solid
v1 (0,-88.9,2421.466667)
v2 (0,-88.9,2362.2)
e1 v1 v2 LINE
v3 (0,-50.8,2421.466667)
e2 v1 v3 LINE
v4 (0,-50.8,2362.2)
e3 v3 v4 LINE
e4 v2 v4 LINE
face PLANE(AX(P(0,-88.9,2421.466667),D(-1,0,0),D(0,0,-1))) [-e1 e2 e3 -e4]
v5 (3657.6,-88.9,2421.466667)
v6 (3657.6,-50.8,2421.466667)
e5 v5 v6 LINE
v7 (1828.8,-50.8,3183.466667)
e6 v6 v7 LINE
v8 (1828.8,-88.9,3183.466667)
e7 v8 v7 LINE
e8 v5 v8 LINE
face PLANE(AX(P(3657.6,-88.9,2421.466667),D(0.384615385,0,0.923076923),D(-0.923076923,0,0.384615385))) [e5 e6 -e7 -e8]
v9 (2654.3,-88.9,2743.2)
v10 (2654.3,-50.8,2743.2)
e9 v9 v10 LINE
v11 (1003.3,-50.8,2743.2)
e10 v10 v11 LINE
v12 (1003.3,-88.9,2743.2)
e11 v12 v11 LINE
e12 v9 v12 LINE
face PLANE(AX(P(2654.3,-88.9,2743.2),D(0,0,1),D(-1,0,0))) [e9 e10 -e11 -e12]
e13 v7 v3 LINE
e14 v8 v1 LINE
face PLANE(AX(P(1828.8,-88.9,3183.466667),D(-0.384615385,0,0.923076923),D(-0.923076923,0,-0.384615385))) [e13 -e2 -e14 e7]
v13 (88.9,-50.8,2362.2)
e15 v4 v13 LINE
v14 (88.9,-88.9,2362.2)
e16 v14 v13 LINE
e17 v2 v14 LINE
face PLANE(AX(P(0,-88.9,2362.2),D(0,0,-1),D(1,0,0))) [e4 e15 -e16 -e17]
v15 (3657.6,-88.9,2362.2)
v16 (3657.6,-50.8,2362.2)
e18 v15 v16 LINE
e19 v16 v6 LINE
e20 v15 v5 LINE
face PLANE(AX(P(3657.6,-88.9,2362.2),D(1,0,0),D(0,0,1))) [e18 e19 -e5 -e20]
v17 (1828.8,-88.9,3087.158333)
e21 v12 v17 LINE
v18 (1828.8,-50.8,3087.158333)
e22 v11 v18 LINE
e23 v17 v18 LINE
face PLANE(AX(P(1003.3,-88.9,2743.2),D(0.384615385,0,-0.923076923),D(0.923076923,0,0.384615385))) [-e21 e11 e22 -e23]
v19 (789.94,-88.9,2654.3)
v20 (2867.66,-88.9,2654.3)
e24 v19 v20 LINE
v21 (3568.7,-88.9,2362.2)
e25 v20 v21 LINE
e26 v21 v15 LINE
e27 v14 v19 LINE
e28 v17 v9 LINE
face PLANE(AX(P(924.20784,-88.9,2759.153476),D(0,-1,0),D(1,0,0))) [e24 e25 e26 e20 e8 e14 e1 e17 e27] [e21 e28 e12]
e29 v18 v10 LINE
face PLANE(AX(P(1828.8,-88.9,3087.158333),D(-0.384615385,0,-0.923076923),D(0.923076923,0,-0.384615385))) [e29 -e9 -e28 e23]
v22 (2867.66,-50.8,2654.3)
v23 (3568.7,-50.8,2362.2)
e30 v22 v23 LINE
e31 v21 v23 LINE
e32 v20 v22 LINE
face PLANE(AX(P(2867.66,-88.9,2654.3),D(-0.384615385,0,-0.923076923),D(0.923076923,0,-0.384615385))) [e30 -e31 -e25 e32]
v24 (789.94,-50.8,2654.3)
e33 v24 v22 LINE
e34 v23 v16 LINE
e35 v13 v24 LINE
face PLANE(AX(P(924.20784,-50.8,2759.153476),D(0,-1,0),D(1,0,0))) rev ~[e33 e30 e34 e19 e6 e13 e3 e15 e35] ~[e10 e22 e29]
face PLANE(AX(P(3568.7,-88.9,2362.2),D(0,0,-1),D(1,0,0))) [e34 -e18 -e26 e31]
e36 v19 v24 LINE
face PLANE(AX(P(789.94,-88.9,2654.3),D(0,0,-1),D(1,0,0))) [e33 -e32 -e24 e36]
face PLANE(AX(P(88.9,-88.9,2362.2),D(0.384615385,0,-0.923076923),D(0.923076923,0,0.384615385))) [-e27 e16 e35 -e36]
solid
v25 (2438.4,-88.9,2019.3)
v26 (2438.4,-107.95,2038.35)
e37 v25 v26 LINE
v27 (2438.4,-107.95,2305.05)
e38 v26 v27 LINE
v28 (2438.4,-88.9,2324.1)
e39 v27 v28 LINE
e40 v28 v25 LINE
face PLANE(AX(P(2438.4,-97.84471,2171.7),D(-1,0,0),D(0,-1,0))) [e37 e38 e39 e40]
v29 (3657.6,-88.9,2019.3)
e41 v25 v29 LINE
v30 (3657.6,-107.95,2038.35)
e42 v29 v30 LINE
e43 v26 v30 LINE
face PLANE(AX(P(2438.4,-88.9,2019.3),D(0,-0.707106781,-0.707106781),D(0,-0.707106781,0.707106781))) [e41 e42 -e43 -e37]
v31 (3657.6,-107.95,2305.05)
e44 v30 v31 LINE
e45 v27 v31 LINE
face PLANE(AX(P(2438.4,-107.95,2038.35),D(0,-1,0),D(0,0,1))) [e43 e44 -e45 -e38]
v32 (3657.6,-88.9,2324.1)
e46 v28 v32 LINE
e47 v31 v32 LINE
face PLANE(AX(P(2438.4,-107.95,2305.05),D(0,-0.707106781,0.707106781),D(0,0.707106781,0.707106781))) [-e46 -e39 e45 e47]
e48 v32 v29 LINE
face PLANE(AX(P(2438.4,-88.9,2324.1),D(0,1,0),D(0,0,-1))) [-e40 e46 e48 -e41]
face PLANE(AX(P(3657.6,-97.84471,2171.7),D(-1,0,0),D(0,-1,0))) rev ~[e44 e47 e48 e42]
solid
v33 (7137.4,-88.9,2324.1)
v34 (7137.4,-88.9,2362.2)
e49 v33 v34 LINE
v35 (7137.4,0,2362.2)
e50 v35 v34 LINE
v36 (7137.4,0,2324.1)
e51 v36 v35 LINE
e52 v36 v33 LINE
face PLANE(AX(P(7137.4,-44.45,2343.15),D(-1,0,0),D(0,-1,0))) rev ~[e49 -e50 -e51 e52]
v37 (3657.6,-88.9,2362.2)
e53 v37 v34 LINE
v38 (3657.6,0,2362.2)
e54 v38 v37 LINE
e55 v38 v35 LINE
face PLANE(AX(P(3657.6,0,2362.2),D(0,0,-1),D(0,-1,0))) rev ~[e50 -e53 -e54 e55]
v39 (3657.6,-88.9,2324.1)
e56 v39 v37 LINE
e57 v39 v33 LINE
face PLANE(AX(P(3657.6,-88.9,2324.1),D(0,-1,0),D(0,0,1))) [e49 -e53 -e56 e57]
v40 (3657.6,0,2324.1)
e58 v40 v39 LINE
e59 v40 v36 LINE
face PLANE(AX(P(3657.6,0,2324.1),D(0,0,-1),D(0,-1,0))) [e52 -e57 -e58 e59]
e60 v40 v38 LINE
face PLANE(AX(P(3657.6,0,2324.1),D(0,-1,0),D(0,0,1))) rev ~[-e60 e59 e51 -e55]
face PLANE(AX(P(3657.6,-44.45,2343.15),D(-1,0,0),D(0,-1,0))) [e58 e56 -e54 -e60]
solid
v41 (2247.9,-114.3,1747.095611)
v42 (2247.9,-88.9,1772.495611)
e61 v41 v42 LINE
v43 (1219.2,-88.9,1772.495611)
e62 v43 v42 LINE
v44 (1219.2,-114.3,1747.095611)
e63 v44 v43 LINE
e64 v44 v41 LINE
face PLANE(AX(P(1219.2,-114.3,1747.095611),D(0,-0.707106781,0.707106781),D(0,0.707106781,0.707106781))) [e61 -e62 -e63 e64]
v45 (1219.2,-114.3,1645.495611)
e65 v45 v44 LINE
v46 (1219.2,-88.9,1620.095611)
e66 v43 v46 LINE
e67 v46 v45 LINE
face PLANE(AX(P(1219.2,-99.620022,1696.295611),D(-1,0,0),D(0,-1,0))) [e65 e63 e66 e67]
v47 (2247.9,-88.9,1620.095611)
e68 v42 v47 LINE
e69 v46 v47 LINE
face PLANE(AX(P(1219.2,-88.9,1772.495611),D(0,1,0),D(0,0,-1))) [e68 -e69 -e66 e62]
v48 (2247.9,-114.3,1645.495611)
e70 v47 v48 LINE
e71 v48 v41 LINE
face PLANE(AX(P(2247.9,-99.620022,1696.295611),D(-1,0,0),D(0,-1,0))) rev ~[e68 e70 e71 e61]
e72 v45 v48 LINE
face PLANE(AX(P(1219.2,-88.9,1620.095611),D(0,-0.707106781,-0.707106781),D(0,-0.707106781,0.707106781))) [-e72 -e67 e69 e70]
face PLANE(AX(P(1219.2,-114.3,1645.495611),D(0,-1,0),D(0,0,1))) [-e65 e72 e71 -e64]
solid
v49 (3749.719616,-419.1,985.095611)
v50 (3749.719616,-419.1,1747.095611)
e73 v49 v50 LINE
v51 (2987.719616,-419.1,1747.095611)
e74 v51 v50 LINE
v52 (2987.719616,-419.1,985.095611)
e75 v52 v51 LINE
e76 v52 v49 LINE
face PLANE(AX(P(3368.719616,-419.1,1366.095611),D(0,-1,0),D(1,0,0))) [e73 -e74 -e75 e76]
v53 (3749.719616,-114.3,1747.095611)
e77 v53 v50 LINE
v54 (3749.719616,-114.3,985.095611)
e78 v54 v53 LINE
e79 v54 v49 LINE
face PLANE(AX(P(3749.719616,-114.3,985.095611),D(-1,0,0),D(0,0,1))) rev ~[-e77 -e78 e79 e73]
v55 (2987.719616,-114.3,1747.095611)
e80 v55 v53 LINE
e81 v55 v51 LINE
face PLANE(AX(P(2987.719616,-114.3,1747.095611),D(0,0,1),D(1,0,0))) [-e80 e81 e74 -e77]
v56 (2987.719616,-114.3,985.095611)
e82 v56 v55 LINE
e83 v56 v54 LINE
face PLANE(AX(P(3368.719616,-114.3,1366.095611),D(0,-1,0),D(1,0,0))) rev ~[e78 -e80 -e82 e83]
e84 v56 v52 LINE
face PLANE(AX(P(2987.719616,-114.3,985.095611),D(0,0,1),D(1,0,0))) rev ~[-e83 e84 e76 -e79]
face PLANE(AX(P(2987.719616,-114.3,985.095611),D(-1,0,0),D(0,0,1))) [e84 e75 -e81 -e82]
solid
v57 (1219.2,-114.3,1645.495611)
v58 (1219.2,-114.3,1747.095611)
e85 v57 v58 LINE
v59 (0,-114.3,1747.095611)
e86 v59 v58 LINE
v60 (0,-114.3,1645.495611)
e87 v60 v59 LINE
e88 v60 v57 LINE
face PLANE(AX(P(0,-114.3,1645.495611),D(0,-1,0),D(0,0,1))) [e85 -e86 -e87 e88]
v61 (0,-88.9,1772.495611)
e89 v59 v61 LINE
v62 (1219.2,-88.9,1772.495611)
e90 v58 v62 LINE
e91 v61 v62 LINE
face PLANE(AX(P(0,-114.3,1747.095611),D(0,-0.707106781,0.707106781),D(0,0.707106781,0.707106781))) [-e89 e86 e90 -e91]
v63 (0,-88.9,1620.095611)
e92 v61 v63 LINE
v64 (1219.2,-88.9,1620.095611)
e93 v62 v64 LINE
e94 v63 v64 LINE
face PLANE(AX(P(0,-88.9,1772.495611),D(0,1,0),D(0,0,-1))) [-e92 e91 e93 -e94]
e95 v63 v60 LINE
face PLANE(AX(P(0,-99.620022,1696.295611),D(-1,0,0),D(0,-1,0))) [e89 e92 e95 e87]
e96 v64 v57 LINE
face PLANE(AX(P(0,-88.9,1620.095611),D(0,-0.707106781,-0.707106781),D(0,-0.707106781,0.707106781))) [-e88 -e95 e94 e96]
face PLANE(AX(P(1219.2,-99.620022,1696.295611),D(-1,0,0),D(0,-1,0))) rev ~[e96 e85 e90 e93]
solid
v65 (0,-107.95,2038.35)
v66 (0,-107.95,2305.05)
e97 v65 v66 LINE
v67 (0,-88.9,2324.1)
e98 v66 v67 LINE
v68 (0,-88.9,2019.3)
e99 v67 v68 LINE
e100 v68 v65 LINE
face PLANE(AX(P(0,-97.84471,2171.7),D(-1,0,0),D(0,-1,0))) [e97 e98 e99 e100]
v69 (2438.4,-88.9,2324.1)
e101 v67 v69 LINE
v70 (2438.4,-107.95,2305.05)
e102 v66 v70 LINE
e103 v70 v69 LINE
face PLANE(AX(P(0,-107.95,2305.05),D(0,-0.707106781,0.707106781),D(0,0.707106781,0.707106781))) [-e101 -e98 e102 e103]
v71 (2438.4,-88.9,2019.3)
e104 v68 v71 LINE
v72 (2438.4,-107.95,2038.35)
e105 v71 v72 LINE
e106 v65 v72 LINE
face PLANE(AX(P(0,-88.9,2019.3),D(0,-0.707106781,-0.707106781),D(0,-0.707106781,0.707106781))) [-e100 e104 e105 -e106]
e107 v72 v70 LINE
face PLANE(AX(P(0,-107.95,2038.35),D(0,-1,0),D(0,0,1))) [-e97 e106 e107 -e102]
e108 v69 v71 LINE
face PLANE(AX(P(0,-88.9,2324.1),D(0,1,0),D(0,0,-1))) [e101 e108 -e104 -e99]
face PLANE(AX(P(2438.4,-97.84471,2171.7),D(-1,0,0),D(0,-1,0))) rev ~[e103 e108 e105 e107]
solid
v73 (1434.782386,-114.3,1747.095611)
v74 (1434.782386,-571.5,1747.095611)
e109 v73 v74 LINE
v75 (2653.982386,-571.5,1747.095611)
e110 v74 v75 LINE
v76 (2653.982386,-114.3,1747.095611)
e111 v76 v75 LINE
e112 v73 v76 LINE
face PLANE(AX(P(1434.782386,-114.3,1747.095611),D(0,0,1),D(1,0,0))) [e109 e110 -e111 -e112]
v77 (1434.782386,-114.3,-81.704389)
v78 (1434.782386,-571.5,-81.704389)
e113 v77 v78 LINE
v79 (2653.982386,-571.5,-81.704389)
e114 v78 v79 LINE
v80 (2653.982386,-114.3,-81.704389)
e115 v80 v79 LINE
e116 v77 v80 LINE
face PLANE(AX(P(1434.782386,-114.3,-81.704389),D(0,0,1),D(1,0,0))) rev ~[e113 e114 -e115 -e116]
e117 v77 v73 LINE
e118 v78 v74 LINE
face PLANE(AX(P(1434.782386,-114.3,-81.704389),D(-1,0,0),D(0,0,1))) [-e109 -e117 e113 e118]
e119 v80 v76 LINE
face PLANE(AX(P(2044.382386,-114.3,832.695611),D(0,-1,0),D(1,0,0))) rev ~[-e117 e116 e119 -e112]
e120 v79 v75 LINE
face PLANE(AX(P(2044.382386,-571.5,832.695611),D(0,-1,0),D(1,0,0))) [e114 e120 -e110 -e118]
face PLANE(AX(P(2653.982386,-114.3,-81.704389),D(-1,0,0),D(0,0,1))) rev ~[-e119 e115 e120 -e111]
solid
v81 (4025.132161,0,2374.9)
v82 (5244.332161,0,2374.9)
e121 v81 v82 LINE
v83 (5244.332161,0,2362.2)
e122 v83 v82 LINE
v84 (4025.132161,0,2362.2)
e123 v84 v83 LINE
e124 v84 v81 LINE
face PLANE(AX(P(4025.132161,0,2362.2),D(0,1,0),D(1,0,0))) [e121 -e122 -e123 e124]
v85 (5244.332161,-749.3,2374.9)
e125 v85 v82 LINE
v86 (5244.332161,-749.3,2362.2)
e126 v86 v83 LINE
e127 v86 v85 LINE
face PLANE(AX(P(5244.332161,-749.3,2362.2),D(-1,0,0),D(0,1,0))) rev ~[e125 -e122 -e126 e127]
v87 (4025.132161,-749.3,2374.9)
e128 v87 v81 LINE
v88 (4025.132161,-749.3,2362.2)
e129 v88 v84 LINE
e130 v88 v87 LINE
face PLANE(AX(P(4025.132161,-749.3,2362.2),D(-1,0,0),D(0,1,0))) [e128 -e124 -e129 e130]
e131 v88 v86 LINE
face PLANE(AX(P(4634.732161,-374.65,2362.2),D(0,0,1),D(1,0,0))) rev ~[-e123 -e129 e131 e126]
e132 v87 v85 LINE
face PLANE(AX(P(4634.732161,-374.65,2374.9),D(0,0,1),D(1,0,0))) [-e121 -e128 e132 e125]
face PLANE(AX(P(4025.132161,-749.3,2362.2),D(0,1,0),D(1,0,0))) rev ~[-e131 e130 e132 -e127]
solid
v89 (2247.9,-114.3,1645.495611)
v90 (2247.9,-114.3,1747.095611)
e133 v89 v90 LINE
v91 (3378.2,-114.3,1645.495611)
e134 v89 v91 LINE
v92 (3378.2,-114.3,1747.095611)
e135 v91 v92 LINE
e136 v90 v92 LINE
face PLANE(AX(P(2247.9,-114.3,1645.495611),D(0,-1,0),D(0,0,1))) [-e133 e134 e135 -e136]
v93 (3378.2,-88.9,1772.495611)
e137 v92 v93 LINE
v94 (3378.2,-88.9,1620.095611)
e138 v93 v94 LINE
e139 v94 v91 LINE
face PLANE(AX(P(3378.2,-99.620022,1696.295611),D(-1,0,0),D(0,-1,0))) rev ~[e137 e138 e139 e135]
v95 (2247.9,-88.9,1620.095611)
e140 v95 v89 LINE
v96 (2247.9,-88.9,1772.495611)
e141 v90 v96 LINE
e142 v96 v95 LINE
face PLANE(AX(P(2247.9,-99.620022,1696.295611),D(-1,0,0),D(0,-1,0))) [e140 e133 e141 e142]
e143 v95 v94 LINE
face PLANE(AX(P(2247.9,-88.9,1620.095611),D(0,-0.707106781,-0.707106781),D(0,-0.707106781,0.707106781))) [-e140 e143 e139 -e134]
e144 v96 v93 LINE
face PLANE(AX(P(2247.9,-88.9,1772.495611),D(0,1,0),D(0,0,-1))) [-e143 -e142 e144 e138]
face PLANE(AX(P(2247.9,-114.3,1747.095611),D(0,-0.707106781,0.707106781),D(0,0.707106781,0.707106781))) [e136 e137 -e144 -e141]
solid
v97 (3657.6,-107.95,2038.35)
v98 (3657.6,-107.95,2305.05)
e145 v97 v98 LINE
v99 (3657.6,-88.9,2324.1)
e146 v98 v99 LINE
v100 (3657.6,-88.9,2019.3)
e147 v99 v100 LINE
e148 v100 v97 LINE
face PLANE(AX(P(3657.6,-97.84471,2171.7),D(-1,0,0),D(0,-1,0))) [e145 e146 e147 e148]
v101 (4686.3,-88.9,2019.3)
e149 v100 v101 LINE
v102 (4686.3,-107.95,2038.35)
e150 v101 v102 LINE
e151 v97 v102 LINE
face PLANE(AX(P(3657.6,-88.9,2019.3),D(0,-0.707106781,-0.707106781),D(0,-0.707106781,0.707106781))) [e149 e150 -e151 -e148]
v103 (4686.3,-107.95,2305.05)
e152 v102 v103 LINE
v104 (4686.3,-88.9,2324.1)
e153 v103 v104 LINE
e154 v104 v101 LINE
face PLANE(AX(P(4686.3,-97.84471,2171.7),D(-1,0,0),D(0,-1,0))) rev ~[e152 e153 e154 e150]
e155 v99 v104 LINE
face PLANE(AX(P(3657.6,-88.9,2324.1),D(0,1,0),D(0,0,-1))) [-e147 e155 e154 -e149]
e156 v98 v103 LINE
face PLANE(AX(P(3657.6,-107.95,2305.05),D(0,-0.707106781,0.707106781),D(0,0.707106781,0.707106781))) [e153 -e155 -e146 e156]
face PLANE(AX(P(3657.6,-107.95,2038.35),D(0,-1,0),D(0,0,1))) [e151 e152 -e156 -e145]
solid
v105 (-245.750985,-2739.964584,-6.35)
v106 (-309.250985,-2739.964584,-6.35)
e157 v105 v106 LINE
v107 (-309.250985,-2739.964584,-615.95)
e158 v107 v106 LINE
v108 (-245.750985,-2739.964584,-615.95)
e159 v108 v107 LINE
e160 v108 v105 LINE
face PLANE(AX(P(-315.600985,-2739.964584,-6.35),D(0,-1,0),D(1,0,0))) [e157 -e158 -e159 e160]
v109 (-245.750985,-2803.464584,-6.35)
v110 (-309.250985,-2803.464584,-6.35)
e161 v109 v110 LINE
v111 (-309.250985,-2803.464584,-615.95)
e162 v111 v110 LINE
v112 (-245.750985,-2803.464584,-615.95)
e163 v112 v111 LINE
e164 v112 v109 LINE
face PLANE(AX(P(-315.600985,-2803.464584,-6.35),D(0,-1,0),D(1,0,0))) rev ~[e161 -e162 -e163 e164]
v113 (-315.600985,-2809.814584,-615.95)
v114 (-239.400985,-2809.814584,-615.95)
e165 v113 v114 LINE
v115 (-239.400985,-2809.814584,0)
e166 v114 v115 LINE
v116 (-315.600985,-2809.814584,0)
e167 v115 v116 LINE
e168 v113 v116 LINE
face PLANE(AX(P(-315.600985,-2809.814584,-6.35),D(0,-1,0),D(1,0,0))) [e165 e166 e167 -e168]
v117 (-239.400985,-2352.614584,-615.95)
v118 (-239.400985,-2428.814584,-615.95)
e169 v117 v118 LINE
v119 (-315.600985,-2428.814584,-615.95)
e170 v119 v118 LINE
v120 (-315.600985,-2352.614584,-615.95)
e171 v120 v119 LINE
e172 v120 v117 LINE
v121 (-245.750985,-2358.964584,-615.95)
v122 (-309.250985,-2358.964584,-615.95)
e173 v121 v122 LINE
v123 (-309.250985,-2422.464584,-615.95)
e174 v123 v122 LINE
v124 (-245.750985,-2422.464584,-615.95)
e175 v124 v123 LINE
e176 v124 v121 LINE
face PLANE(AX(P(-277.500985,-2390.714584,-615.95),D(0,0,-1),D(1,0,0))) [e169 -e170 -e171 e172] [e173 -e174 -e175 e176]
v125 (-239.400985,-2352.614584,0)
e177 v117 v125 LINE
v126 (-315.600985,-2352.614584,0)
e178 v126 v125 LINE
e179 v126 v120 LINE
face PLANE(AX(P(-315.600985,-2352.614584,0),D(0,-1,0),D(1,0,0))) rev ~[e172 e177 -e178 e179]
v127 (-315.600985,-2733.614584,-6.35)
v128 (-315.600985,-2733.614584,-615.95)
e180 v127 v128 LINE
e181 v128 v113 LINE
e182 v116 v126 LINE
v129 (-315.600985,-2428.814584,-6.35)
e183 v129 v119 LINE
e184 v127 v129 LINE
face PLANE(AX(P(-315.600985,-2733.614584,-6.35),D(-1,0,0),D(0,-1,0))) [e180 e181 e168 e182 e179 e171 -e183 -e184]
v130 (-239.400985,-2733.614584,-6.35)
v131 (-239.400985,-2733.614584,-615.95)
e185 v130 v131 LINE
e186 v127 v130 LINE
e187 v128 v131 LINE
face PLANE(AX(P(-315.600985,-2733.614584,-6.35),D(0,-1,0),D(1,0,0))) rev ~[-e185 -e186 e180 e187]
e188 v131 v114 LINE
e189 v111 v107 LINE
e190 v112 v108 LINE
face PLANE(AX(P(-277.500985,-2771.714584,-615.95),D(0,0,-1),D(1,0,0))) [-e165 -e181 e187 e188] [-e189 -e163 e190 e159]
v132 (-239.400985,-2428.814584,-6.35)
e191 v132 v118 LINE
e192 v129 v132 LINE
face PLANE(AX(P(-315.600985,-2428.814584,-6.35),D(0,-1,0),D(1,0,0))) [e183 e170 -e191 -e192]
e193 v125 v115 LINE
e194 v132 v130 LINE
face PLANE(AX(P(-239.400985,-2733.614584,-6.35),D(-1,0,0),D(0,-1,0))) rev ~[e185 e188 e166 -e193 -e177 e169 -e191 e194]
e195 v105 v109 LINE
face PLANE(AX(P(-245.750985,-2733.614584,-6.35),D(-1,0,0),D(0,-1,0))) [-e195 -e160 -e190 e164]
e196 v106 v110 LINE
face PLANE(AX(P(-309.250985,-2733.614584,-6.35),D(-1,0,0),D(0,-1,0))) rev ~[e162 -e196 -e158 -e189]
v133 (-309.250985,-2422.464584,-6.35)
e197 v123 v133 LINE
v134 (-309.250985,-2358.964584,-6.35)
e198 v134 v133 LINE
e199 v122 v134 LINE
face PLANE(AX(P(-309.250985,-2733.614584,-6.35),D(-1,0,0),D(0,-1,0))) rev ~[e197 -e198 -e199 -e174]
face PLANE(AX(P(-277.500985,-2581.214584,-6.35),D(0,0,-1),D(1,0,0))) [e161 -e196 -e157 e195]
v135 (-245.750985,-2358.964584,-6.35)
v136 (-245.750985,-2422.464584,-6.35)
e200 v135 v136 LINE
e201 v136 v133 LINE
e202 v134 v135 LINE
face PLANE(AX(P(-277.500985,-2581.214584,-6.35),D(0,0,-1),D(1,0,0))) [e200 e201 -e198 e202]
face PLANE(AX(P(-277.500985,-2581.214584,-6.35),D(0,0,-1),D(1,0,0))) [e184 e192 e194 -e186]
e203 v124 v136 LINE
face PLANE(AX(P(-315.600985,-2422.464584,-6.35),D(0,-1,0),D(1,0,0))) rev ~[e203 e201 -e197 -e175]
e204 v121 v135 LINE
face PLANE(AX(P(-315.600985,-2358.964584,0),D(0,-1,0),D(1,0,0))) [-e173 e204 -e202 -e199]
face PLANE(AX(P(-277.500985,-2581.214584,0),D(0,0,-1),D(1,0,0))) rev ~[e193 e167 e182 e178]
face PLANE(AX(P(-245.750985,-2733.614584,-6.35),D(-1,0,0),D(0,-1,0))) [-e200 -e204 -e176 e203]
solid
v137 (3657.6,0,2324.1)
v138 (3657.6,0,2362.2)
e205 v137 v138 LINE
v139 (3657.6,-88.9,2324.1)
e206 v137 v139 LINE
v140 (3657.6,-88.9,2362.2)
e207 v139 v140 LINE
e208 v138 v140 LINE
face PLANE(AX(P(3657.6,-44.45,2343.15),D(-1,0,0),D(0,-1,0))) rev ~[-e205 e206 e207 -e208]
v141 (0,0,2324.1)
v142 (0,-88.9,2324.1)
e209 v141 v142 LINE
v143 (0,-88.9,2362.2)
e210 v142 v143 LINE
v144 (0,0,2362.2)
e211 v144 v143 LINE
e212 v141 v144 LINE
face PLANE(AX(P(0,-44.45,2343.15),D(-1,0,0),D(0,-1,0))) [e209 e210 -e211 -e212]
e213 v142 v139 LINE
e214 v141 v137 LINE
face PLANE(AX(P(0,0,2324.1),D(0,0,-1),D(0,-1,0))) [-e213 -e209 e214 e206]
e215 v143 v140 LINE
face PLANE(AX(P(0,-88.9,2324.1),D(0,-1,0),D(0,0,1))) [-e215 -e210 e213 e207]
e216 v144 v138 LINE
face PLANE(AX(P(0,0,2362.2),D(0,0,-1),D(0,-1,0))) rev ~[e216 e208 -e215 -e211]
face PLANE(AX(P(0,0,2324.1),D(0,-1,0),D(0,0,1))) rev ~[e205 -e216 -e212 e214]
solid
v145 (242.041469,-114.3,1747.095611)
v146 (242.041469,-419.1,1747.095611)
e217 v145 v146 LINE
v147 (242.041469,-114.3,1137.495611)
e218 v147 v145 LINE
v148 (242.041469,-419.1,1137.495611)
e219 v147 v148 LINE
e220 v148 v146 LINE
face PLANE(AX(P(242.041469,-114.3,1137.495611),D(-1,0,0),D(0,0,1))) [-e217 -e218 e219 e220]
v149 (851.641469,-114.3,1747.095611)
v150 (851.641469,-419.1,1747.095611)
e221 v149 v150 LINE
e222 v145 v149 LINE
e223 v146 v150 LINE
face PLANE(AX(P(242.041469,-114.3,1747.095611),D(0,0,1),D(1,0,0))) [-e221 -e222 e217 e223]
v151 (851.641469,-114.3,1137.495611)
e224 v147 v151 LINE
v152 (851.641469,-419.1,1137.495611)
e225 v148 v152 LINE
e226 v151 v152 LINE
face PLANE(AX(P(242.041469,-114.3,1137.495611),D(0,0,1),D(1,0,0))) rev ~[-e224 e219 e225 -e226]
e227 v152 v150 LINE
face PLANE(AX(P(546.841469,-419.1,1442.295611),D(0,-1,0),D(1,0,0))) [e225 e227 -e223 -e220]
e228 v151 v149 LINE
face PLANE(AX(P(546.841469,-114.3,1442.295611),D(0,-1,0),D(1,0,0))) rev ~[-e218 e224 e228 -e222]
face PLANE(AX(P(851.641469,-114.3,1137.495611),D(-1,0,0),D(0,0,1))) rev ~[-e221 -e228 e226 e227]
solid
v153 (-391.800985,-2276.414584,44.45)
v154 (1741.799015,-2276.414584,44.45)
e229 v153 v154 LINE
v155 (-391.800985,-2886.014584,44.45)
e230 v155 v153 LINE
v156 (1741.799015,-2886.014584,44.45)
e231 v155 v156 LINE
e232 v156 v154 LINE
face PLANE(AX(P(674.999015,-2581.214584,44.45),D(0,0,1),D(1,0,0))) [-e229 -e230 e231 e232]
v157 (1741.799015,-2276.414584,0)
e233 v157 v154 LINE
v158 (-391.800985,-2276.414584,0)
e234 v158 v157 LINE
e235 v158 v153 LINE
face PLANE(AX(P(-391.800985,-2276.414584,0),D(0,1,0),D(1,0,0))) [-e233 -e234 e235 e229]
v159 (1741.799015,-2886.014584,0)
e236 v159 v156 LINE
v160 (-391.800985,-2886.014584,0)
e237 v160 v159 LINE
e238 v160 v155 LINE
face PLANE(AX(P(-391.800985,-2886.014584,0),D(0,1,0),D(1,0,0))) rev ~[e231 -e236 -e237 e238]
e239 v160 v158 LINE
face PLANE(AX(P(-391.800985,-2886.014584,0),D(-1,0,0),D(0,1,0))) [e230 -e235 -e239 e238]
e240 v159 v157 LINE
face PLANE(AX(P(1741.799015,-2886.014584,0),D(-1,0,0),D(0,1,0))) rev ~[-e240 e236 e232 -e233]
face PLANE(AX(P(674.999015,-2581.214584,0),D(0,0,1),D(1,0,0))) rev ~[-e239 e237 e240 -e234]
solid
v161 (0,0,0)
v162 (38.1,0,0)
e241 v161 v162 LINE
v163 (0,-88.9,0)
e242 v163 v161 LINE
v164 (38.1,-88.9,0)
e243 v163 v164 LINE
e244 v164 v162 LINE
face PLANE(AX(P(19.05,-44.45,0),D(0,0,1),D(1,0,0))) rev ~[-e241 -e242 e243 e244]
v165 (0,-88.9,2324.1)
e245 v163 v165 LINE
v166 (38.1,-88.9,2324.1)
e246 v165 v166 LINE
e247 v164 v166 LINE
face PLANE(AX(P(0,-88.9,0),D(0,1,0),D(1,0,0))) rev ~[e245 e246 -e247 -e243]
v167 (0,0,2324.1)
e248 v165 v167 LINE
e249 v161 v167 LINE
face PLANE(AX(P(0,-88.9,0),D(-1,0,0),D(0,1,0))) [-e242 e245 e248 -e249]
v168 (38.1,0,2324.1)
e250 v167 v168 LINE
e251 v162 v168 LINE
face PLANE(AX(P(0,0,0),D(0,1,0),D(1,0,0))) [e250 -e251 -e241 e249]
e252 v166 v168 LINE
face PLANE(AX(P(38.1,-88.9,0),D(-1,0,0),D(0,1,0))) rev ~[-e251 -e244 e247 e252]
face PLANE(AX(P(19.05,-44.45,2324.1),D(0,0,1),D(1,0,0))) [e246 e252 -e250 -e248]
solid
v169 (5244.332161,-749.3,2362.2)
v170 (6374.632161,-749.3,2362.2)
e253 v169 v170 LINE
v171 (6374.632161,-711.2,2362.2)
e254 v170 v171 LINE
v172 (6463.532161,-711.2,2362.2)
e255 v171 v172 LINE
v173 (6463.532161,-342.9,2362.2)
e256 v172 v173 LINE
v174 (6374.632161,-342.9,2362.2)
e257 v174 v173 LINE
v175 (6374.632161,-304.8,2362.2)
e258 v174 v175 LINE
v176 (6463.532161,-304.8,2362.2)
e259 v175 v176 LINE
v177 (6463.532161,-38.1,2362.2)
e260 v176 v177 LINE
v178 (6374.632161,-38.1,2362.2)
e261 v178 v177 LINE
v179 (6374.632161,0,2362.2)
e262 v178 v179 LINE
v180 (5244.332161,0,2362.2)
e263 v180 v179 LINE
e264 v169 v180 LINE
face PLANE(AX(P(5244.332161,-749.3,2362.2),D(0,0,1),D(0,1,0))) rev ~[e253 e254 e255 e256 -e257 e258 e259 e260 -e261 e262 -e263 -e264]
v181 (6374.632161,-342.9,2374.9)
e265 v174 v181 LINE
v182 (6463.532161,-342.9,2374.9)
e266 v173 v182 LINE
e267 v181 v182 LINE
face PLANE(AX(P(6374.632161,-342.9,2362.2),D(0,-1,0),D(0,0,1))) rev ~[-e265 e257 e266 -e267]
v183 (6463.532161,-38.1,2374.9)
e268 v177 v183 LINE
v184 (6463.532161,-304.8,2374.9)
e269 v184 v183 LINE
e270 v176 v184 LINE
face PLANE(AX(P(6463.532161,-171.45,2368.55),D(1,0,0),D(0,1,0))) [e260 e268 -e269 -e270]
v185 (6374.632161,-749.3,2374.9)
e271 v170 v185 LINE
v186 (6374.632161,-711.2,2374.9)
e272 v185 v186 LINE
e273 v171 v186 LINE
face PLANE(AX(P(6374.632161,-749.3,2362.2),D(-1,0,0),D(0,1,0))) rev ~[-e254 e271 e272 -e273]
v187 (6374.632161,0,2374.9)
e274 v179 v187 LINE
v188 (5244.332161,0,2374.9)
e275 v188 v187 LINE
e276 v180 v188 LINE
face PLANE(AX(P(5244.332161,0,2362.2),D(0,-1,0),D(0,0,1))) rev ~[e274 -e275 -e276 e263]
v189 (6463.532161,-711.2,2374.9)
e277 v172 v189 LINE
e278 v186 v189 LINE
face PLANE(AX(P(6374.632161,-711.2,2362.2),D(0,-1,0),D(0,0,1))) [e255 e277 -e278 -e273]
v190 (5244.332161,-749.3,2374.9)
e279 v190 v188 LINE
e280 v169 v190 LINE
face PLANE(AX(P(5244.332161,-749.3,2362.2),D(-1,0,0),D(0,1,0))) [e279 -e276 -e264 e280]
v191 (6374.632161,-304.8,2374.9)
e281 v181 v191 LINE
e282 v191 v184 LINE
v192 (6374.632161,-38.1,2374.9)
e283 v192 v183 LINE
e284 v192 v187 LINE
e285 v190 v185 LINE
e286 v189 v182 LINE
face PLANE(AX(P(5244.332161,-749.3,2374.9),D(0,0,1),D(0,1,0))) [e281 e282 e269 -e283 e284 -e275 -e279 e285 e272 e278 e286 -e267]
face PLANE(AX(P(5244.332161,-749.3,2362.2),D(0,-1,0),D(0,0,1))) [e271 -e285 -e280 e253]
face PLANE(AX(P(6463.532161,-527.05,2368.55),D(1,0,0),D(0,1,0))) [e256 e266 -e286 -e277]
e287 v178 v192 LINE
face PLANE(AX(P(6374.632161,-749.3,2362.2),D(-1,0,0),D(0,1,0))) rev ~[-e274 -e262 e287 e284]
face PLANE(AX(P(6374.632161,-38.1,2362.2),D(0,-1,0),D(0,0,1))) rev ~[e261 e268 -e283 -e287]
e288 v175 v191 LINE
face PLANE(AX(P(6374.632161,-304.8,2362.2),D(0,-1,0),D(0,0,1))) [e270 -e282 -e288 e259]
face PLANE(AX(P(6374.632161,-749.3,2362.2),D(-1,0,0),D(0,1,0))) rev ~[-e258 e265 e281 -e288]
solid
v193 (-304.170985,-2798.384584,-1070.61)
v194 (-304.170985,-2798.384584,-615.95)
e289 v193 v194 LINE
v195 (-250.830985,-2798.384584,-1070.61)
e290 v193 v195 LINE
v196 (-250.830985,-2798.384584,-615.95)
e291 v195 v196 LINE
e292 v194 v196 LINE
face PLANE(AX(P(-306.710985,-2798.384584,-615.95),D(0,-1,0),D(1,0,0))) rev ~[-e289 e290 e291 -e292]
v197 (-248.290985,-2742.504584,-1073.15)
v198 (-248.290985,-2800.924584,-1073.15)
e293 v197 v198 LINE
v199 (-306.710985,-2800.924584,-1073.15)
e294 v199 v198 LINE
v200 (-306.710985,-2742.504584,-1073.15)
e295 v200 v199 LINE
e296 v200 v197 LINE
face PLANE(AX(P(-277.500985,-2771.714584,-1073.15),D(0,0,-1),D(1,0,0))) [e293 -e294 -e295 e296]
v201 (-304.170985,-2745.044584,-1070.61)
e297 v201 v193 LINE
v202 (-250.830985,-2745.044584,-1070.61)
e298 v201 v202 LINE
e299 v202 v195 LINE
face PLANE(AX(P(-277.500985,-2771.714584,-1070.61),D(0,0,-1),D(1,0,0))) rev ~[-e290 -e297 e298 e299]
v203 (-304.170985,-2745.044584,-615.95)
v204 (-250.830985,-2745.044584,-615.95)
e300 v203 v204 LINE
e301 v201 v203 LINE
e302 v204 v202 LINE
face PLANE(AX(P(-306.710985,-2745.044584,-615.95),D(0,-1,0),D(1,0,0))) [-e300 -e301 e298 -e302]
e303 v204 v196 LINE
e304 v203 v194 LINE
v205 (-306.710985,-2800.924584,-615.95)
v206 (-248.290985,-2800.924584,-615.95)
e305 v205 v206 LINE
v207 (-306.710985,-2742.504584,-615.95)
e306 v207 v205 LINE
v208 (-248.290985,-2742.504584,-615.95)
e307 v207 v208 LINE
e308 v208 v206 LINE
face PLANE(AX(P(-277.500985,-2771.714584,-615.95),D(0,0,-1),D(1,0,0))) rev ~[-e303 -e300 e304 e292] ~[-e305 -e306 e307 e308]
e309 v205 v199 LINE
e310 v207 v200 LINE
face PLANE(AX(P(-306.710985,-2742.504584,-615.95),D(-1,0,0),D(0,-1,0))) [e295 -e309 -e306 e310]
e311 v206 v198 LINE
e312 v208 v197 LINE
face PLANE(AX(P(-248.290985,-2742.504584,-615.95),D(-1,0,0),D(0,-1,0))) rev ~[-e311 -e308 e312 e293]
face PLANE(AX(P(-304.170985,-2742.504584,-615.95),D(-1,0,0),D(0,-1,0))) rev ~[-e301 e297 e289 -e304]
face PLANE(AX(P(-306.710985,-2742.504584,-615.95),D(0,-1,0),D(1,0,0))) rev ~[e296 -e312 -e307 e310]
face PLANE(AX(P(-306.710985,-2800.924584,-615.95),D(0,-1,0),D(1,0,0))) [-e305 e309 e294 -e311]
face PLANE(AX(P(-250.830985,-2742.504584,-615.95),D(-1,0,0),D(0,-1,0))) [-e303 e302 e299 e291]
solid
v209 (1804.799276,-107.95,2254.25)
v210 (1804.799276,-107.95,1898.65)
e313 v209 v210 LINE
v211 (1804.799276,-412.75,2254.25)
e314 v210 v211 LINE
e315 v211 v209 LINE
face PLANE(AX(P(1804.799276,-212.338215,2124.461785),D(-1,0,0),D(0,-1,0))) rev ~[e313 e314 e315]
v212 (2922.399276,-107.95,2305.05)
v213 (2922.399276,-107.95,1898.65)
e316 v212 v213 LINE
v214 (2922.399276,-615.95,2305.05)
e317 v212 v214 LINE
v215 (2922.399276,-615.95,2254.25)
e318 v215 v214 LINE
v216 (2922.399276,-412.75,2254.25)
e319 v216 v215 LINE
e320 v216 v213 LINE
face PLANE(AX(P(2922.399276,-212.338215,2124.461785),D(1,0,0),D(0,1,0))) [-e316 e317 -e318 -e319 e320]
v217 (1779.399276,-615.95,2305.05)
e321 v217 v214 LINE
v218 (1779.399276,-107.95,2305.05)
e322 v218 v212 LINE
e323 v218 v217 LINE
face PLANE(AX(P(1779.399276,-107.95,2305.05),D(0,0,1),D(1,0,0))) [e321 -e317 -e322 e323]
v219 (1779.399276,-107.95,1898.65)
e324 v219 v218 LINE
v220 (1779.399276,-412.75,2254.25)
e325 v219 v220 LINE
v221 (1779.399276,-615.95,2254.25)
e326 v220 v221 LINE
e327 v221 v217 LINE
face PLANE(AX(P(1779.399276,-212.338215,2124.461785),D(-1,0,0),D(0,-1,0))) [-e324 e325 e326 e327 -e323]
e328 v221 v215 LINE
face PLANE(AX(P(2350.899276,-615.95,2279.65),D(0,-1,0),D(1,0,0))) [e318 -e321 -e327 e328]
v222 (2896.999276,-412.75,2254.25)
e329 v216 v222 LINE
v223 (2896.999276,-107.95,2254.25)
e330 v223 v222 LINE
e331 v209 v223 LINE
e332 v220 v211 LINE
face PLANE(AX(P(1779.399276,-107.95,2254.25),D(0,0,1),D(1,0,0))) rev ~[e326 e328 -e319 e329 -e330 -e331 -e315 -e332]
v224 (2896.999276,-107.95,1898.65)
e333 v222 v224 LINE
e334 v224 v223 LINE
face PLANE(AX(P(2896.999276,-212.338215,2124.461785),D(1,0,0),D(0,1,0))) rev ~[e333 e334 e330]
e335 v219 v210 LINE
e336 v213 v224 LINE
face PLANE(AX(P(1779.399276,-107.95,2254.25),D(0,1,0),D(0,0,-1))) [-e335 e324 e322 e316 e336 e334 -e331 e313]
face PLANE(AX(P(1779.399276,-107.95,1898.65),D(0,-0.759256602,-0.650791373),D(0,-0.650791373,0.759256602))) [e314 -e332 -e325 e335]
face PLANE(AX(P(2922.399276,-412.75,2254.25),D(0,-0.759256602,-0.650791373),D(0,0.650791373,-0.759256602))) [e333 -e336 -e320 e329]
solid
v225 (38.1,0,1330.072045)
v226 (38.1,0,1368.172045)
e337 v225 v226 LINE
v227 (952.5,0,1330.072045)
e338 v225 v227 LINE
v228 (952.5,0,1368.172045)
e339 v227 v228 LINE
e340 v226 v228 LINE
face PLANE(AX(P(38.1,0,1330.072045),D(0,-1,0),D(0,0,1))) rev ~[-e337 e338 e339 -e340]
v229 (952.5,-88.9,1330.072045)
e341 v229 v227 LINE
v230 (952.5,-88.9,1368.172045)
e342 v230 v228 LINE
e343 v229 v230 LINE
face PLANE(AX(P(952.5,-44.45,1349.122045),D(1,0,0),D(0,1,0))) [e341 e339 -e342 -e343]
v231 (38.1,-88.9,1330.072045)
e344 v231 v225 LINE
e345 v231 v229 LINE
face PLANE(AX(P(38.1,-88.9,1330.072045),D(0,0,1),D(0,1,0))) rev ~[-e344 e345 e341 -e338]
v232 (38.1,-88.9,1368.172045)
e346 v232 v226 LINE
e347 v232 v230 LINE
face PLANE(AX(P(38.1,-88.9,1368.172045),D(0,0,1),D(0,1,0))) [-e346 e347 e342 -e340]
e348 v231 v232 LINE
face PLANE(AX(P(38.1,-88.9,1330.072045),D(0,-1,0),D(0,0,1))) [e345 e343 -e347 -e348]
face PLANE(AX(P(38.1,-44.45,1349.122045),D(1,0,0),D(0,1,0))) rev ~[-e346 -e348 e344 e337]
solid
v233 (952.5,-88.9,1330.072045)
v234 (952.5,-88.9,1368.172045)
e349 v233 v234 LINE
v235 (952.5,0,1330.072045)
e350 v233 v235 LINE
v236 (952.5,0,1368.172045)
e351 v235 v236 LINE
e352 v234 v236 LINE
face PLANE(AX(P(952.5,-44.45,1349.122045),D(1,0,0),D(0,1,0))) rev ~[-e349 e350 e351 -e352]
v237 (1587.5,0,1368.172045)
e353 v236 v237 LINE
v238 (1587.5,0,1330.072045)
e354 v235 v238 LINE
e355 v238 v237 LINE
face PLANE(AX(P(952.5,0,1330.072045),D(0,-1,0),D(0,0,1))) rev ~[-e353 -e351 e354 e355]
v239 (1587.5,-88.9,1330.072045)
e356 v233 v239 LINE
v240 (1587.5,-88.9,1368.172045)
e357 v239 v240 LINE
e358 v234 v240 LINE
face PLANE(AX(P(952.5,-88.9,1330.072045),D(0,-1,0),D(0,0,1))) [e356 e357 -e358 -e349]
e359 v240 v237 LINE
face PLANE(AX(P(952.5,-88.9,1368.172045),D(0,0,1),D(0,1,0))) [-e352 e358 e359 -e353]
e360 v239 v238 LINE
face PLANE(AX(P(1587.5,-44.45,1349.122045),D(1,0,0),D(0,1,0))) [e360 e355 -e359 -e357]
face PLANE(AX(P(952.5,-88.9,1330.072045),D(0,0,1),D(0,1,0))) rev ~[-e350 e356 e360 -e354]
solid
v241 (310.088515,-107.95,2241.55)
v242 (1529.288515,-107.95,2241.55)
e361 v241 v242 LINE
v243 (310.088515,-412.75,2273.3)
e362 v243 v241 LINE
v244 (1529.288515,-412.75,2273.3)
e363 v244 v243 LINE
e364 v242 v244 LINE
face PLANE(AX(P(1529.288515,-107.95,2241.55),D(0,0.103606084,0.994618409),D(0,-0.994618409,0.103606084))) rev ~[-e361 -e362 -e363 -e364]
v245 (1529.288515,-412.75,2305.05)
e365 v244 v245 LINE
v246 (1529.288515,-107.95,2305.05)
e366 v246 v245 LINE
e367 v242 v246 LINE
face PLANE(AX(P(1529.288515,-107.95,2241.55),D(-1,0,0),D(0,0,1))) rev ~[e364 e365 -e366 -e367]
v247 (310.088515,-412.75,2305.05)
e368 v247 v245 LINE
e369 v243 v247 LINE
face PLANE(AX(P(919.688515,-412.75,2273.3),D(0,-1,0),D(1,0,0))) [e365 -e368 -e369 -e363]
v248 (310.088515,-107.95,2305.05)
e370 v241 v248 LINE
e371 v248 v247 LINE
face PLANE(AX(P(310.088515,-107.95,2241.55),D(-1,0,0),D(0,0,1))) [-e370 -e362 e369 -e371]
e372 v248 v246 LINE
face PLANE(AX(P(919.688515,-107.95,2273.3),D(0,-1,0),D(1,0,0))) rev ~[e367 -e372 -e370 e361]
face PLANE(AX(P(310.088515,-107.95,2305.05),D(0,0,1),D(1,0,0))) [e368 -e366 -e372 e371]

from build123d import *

# Parameters (mm, degrees)
F0_W      = 38.1
F0_H      = 88.9
F1_DEPTH  = 2324.1
F2_W      = 88.9
F2_H      = 38.1
F3_DEPTH  = 3657.6
F5_DEPTH  = 2438.4
F6_DEPTH  = 1219.2
F8_DEPTH  = 1219.2
F9_W      = 88.9
F9_H      = 38.1
F10_DEPTH = 914.4
F11_DEPTH = 1028.7
F12_DEPTH = 1028.7
F13_W     = 609.6
F13_H     = 609.6
F14_DEPTH = 304.8
F15_W     = 1219.2
F15_H     = 1828.8
F16_DEPTH = 457.2
F17_W     = 762
F17_H     = 762
F18_DEPTH = 304.8
F19_W     = 1219.2
F19_H     = 63.5
F20_DEPTH = 304.8
F22_DEPTH = 1529.2895152817
F23_W     = 1143
F23_H     = 50.8
F24_DEPTH = 508
F26_DEPTH = 25.4
F28_DEPTH = 25.4
F29_DEPTH = 1130.3
F30_W     = 1219.2
F30_H     = 749.3
F31_DEPTH = 12.7
F32_DEPTH = 3479.8
F33_DEPTH = 1130.3
F34_DEPTH = 635
F35_W     = 266.7
F35_H     = 12.7
F35_W_2   = 368.3
F36_DEPTH = 88.9
F37_W     = 2133.6
F37_H     = 609.6
F38_DEPTH = 44.45
F40_DEPTH = 38.1
F42_DEPTH = 6.35
F43_W     = 76.2
F43_H     = 76.2
F44_DEPTH = 609.6
F45_T     = -6.35
F46_W     = 58.42
F46_H     = 58.42
F47_DEPTH = 457.2
F48_T     = -2.54


with BuildPart() as f1:
    # F0 (on Top) → F1 (new body)
    with BuildSketch(Plane.XY):
        with Locations((19.05, -44.45)):
            Rectangle(F0_W, F0_H)
    extrude(amount=F1_DEPTH)


with BuildPart() as f3:
    # F2 (on face) → F3 (new body)
    with BuildSketch(Plane(origin=(0, 0, 0), x_dir=(0, -1, 0), z_dir=(-1, 0, 0))):
        with Locations((44.45, 2343.15)):
            Rectangle(F2_W, F2_H)
    extrude(amount=-F3_DEPTH)


with BuildPart() as f5:
    # F4 (on face) → F5 (new body)
    with BuildSketch(Plane(origin=(0, 0, 0), x_dir=(0, -1, 0), z_dir=(-1, 0, 0))):
        Polygon((107.95, 2305.05), (88.9, 2324.1), (88.9, 2019.3), (107.95, 2038.35), align=None)
    extrude(amount=-F5_DEPTH)


with BuildPart() as f6:
    # F6 (new): a face of the model
    f6_faces = [f5.part.faces().sort_by_distance(p)[0] for p in [
        (2438.4, -98.2133333333, 2171.7),
    ]]
    extrude(f6_faces, amount=F6_DEPTH)


with BuildPart() as f8:
    # F7 (on face) → F8 (new body)
    with BuildSketch(Plane(origin=(0, 0, 0), x_dir=(0, -1, 0), z_dir=(-1, 0, 0))):
        Polygon((114.3, 1747.0956106186), (88.9, 1772.4956106186), (88.9, 1620.0956106186), (114.3, 1645.4956106186), align=None)
    extrude(amount=-F8_DEPTH)


with BuildPart() as f10:
    # F9 (on face) → F10 (new body)
    with BuildSketch(Plane.YZ.offset(38.1)):
        with Locations((-44.45, 1349.1220453262)):
            Rectangle(F9_W, F9_H)
    extrude(amount=F10_DEPTH)


with BuildPart() as f11:
    # F11 (new): a face of the model
    f11_faces = [f6.part.faces().sort_by_distance(p)[0] for p in [
        (3657.6, -98.2133333333, 2171.7),
    ]]
    extrude(f11_faces, amount=F11_DEPTH)


with BuildPart() as f12:
    # F12 (new): a face of the model
    f12_faces = [f8.part.faces().sort_by_distance(p)[0] for p in [
        (1219.2, -100.7533333333, 1696.2956106186),
    ]]
    extrude(f12_faces, amount=F12_DEPTH)


with BuildPart() as f14:
    # F13 (on face) → F14 (new body)
    with BuildSketch(Plane.XZ.offset(114.3)):
        with Locations((546.8414686203, 1442.2956106186)):
            Rectangle(F13_W, F13_H)
    extrude(amount=F14_DEPTH)


with BuildPart() as f16:
    # F15 (on face) → F16 (new body)
    with BuildSketch(Plane.XZ.offset(114.3)):
        with Locations((2044.3823858261, 832.6956106186)):
            Rectangle(F15_W, F15_H)
    extrude(amount=F16_DEPTH)


with BuildPart() as f18:
    # F17 (on face) → F18 (new body)
    with BuildSketch(Plane.XZ.offset(114.3)):
        with Locations((3368.7196163048, 1366.0956106186)):
            Rectangle(F17_W, F17_H)
    extrude(amount=F18_DEPTH)


with BuildPart() as f20:
    # F19 (on face) → F20 (new body)
    with BuildSketch(Plane.XZ.offset(107.95)):
        with Locations((919.6885152817, 2273.3)):
            Rectangle(F19_W, F19_H)
    extrude(amount=F20_DEPTH)

    # F21 (on face) → F22 (cut, through all)
    with BuildSketch(Plane.YZ.offset(1529.2885152817)):
        Polygon((-107.95, 2241.55), (-412.75, 2273.3), (-412.75, 2241.55), align=None)
    extrude(amount=-F22_DEPTH, mode=Mode.SUBTRACT)


with BuildPart() as f24:
    # F23 (on face) → F24 (new body)
    with BuildSketch(Plane.XZ.offset(107.95)):
        with Locations((2350.8992757797, 2279.65)):
            Rectangle(F23_W, F23_H)
    extrude(amount=F24_DEPTH)

    # F25 (on face) → F26 (join)
    with BuildSketch(Plane.YZ.offset(2922.3992757797)):
        Polygon((-107.95, 1898.65), (-107.95, 2254.25), (-412.75, 2254.25), align=None)
    extrude(amount=-F26_DEPTH)

    # F27 (on face) → F28 (join)
    with BuildSketch(Plane(origin=(1779.3992757797, 0, 0), x_dir=(0, -1, 0), z_dir=(-1, 0, 0))):
        Polygon((107.95, 2254.25), (107.95, 1898.65), (412.75, 2254.25), align=None)
    extrude(amount=-F28_DEPTH)


with BuildPart() as f29:
    # F29 (new): a face of the model
    f29_faces = [f12.part.faces().sort_by_distance(p)[0] for p in [
        (2247.9, -100.7533333333, 1696.2956106186),
    ]]
    extrude(f29_faces, amount=F29_DEPTH)


with BuildPart() as f31:
    # F30 (on face) → F31 (new body)
    with BuildSketch(Plane.XY.offset(2362.2)):
        with Locations((4634.7321610946, -374.65)):
            Rectangle(F30_W, F30_H)
    extrude(amount=F31_DEPTH)


with BuildPart() as f32:
    # F32 (new): a face of the model
    f32_faces = [f3.part.faces().sort_by_distance(p)[0] for p in [
        (3657.6, -44.45, 2343.15),
    ]]
    extrude(f32_faces, amount=F32_DEPTH)


with BuildPart() as f33:
    # F33 (new): a face of the model
    f33_faces = [f31.part.faces().sort_by_distance(p)[0] for p in [
        (5244.3321610946, -374.65, 2368.55),
    ]]
    extrude(f33_faces, amount=F33_DEPTH)

    # F35 (on face) → F36 (join)
    with BuildSketch(Plane.YZ.offset(6374.6321610946)):
        with Locations((-171.45, 2368.55)):
            Rectangle(F35_W, F35_H)
        with Locations((-527.05, 2368.55)):
            Rectangle(F35_W_2, F35_H)
    extrude(amount=F36_DEPTH)


with BuildPart() as f34:
    # F34 (new): a face of the model
    f34_faces = [f10.part.faces().sort_by_distance(p)[0] for p in [
        (952.5, -44.45, 1349.1220453262),
    ]]
    extrude(f34_faces, amount=F34_DEPTH)


with BuildPart() as f38:
    # F37 (on Top) → F38 (new body)
    with BuildSketch(Plane.XY):
        with Locations((674.9990154266, -2581.2145842905)):
            Rectangle(F37_W, F37_H)
    extrude(amount=F38_DEPTH)


with BuildPart() as f40:
    # F39 (on face) → F40 (new body)
    with BuildSketch(Plane.XZ.offset(88.9)):
        Polygon((1828.8, 3183.4666666667), (0, 2421.4666666667), (0, 2362.2), (88.9, 2362.2), (789.94, 2654.3), (1003.3, 2743.2), (1828.8, 3087.1583333333), align=None)
        Polygon((3657.6, 2421.4666666667), (1828.8, 3183.4666666667), (1828.8, 3087.1583333333), (2654.3, 2743.2), (2867.66, 2654.3), (3263.9, 2489.2), (3568.7, 2362.2), (3657.6, 2362.2), align=None)
        Polygon((2654.3, 2743.2), (1828.8, 2743.2), (1828.8, 2654.3), (2867.66, 2654.3), align=None)
        Polygon((1828.8, 2654.3), (1828.8, 2743.2), (1003.3, 2743.2), (789.94, 2654.3), align=None)
    extrude(amount=-F40_DEPTH)


with BuildPart() as f42:
    # F41 (on face) → F42 (new body)
    with BuildSketch(Plane(origin=(0, 0, 0), x_dir=(1, 0, 0), z_dir=(0, 0, -1))):
        Polygon((-239.4009845734, 2809.8145842905), (-315.6009845734, 2809.8145842905), (-315.6009845734, 2581.2145842905), (-315.6009845734, 2352.6145842905), (-239.4009845734, 2352.6145842905), align=None)
    extrude(amount=F42_DEPTH)

    # F43 (on face) → F44 (join)
    with BuildSketch(Plane(origin=(0, 0, -6.35), x_dir=(1, 0, 0), z_dir=(0, 0, -1))):
        with Locations((-277.5009845734, 2771.7145842905)):
            Rectangle(F43_W, F43_H)
        with Locations((-277.5009845734, 2390.7145842905)):
            Rectangle(F43_W, F43_H)
    extrude(amount=F44_DEPTH)

    # F45
    f45_openings = [f42.faces().sort_by_distance(p)[0] for p in [
        (-277.500985, -2771.714584, -615.95),
        (-277.500985, -2390.714584, -615.95),
    ]]
    offset(amount=F45_T, openings=f45_openings, kind=Kind.INTERSECTION)


with BuildPart() as f47:
    # F46 (on face) → F47 (new body)
    with BuildSketch(Plane(origin=(0, 0, -615.95), x_dir=(1, 0, 0), z_dir=(0, 0, -1))):
        with Locations((-277.5009845734, 2771.7145842905)):
            Rectangle(F46_W, F46_H)
    extrude(amount=F47_DEPTH)

    # F48
    f48_openings = [f47.faces().sort_by_distance(p)[0] for p in [
        (-277.500985, -2771.714584, -615.95),
    ]]
    offset(amount=F48_T, openings=f48_openings)


solid = Compound([f1.part, f3.part, f5.part, f6.part, f8.part, f10.part, f11.part, f12.part, f14.part, f16.part, f18.part, f20.part, f24.part, f29.part, f31.part, f32.part, f33.part, f34.part, f38.part, f40.part, f42.part, f47.part])
